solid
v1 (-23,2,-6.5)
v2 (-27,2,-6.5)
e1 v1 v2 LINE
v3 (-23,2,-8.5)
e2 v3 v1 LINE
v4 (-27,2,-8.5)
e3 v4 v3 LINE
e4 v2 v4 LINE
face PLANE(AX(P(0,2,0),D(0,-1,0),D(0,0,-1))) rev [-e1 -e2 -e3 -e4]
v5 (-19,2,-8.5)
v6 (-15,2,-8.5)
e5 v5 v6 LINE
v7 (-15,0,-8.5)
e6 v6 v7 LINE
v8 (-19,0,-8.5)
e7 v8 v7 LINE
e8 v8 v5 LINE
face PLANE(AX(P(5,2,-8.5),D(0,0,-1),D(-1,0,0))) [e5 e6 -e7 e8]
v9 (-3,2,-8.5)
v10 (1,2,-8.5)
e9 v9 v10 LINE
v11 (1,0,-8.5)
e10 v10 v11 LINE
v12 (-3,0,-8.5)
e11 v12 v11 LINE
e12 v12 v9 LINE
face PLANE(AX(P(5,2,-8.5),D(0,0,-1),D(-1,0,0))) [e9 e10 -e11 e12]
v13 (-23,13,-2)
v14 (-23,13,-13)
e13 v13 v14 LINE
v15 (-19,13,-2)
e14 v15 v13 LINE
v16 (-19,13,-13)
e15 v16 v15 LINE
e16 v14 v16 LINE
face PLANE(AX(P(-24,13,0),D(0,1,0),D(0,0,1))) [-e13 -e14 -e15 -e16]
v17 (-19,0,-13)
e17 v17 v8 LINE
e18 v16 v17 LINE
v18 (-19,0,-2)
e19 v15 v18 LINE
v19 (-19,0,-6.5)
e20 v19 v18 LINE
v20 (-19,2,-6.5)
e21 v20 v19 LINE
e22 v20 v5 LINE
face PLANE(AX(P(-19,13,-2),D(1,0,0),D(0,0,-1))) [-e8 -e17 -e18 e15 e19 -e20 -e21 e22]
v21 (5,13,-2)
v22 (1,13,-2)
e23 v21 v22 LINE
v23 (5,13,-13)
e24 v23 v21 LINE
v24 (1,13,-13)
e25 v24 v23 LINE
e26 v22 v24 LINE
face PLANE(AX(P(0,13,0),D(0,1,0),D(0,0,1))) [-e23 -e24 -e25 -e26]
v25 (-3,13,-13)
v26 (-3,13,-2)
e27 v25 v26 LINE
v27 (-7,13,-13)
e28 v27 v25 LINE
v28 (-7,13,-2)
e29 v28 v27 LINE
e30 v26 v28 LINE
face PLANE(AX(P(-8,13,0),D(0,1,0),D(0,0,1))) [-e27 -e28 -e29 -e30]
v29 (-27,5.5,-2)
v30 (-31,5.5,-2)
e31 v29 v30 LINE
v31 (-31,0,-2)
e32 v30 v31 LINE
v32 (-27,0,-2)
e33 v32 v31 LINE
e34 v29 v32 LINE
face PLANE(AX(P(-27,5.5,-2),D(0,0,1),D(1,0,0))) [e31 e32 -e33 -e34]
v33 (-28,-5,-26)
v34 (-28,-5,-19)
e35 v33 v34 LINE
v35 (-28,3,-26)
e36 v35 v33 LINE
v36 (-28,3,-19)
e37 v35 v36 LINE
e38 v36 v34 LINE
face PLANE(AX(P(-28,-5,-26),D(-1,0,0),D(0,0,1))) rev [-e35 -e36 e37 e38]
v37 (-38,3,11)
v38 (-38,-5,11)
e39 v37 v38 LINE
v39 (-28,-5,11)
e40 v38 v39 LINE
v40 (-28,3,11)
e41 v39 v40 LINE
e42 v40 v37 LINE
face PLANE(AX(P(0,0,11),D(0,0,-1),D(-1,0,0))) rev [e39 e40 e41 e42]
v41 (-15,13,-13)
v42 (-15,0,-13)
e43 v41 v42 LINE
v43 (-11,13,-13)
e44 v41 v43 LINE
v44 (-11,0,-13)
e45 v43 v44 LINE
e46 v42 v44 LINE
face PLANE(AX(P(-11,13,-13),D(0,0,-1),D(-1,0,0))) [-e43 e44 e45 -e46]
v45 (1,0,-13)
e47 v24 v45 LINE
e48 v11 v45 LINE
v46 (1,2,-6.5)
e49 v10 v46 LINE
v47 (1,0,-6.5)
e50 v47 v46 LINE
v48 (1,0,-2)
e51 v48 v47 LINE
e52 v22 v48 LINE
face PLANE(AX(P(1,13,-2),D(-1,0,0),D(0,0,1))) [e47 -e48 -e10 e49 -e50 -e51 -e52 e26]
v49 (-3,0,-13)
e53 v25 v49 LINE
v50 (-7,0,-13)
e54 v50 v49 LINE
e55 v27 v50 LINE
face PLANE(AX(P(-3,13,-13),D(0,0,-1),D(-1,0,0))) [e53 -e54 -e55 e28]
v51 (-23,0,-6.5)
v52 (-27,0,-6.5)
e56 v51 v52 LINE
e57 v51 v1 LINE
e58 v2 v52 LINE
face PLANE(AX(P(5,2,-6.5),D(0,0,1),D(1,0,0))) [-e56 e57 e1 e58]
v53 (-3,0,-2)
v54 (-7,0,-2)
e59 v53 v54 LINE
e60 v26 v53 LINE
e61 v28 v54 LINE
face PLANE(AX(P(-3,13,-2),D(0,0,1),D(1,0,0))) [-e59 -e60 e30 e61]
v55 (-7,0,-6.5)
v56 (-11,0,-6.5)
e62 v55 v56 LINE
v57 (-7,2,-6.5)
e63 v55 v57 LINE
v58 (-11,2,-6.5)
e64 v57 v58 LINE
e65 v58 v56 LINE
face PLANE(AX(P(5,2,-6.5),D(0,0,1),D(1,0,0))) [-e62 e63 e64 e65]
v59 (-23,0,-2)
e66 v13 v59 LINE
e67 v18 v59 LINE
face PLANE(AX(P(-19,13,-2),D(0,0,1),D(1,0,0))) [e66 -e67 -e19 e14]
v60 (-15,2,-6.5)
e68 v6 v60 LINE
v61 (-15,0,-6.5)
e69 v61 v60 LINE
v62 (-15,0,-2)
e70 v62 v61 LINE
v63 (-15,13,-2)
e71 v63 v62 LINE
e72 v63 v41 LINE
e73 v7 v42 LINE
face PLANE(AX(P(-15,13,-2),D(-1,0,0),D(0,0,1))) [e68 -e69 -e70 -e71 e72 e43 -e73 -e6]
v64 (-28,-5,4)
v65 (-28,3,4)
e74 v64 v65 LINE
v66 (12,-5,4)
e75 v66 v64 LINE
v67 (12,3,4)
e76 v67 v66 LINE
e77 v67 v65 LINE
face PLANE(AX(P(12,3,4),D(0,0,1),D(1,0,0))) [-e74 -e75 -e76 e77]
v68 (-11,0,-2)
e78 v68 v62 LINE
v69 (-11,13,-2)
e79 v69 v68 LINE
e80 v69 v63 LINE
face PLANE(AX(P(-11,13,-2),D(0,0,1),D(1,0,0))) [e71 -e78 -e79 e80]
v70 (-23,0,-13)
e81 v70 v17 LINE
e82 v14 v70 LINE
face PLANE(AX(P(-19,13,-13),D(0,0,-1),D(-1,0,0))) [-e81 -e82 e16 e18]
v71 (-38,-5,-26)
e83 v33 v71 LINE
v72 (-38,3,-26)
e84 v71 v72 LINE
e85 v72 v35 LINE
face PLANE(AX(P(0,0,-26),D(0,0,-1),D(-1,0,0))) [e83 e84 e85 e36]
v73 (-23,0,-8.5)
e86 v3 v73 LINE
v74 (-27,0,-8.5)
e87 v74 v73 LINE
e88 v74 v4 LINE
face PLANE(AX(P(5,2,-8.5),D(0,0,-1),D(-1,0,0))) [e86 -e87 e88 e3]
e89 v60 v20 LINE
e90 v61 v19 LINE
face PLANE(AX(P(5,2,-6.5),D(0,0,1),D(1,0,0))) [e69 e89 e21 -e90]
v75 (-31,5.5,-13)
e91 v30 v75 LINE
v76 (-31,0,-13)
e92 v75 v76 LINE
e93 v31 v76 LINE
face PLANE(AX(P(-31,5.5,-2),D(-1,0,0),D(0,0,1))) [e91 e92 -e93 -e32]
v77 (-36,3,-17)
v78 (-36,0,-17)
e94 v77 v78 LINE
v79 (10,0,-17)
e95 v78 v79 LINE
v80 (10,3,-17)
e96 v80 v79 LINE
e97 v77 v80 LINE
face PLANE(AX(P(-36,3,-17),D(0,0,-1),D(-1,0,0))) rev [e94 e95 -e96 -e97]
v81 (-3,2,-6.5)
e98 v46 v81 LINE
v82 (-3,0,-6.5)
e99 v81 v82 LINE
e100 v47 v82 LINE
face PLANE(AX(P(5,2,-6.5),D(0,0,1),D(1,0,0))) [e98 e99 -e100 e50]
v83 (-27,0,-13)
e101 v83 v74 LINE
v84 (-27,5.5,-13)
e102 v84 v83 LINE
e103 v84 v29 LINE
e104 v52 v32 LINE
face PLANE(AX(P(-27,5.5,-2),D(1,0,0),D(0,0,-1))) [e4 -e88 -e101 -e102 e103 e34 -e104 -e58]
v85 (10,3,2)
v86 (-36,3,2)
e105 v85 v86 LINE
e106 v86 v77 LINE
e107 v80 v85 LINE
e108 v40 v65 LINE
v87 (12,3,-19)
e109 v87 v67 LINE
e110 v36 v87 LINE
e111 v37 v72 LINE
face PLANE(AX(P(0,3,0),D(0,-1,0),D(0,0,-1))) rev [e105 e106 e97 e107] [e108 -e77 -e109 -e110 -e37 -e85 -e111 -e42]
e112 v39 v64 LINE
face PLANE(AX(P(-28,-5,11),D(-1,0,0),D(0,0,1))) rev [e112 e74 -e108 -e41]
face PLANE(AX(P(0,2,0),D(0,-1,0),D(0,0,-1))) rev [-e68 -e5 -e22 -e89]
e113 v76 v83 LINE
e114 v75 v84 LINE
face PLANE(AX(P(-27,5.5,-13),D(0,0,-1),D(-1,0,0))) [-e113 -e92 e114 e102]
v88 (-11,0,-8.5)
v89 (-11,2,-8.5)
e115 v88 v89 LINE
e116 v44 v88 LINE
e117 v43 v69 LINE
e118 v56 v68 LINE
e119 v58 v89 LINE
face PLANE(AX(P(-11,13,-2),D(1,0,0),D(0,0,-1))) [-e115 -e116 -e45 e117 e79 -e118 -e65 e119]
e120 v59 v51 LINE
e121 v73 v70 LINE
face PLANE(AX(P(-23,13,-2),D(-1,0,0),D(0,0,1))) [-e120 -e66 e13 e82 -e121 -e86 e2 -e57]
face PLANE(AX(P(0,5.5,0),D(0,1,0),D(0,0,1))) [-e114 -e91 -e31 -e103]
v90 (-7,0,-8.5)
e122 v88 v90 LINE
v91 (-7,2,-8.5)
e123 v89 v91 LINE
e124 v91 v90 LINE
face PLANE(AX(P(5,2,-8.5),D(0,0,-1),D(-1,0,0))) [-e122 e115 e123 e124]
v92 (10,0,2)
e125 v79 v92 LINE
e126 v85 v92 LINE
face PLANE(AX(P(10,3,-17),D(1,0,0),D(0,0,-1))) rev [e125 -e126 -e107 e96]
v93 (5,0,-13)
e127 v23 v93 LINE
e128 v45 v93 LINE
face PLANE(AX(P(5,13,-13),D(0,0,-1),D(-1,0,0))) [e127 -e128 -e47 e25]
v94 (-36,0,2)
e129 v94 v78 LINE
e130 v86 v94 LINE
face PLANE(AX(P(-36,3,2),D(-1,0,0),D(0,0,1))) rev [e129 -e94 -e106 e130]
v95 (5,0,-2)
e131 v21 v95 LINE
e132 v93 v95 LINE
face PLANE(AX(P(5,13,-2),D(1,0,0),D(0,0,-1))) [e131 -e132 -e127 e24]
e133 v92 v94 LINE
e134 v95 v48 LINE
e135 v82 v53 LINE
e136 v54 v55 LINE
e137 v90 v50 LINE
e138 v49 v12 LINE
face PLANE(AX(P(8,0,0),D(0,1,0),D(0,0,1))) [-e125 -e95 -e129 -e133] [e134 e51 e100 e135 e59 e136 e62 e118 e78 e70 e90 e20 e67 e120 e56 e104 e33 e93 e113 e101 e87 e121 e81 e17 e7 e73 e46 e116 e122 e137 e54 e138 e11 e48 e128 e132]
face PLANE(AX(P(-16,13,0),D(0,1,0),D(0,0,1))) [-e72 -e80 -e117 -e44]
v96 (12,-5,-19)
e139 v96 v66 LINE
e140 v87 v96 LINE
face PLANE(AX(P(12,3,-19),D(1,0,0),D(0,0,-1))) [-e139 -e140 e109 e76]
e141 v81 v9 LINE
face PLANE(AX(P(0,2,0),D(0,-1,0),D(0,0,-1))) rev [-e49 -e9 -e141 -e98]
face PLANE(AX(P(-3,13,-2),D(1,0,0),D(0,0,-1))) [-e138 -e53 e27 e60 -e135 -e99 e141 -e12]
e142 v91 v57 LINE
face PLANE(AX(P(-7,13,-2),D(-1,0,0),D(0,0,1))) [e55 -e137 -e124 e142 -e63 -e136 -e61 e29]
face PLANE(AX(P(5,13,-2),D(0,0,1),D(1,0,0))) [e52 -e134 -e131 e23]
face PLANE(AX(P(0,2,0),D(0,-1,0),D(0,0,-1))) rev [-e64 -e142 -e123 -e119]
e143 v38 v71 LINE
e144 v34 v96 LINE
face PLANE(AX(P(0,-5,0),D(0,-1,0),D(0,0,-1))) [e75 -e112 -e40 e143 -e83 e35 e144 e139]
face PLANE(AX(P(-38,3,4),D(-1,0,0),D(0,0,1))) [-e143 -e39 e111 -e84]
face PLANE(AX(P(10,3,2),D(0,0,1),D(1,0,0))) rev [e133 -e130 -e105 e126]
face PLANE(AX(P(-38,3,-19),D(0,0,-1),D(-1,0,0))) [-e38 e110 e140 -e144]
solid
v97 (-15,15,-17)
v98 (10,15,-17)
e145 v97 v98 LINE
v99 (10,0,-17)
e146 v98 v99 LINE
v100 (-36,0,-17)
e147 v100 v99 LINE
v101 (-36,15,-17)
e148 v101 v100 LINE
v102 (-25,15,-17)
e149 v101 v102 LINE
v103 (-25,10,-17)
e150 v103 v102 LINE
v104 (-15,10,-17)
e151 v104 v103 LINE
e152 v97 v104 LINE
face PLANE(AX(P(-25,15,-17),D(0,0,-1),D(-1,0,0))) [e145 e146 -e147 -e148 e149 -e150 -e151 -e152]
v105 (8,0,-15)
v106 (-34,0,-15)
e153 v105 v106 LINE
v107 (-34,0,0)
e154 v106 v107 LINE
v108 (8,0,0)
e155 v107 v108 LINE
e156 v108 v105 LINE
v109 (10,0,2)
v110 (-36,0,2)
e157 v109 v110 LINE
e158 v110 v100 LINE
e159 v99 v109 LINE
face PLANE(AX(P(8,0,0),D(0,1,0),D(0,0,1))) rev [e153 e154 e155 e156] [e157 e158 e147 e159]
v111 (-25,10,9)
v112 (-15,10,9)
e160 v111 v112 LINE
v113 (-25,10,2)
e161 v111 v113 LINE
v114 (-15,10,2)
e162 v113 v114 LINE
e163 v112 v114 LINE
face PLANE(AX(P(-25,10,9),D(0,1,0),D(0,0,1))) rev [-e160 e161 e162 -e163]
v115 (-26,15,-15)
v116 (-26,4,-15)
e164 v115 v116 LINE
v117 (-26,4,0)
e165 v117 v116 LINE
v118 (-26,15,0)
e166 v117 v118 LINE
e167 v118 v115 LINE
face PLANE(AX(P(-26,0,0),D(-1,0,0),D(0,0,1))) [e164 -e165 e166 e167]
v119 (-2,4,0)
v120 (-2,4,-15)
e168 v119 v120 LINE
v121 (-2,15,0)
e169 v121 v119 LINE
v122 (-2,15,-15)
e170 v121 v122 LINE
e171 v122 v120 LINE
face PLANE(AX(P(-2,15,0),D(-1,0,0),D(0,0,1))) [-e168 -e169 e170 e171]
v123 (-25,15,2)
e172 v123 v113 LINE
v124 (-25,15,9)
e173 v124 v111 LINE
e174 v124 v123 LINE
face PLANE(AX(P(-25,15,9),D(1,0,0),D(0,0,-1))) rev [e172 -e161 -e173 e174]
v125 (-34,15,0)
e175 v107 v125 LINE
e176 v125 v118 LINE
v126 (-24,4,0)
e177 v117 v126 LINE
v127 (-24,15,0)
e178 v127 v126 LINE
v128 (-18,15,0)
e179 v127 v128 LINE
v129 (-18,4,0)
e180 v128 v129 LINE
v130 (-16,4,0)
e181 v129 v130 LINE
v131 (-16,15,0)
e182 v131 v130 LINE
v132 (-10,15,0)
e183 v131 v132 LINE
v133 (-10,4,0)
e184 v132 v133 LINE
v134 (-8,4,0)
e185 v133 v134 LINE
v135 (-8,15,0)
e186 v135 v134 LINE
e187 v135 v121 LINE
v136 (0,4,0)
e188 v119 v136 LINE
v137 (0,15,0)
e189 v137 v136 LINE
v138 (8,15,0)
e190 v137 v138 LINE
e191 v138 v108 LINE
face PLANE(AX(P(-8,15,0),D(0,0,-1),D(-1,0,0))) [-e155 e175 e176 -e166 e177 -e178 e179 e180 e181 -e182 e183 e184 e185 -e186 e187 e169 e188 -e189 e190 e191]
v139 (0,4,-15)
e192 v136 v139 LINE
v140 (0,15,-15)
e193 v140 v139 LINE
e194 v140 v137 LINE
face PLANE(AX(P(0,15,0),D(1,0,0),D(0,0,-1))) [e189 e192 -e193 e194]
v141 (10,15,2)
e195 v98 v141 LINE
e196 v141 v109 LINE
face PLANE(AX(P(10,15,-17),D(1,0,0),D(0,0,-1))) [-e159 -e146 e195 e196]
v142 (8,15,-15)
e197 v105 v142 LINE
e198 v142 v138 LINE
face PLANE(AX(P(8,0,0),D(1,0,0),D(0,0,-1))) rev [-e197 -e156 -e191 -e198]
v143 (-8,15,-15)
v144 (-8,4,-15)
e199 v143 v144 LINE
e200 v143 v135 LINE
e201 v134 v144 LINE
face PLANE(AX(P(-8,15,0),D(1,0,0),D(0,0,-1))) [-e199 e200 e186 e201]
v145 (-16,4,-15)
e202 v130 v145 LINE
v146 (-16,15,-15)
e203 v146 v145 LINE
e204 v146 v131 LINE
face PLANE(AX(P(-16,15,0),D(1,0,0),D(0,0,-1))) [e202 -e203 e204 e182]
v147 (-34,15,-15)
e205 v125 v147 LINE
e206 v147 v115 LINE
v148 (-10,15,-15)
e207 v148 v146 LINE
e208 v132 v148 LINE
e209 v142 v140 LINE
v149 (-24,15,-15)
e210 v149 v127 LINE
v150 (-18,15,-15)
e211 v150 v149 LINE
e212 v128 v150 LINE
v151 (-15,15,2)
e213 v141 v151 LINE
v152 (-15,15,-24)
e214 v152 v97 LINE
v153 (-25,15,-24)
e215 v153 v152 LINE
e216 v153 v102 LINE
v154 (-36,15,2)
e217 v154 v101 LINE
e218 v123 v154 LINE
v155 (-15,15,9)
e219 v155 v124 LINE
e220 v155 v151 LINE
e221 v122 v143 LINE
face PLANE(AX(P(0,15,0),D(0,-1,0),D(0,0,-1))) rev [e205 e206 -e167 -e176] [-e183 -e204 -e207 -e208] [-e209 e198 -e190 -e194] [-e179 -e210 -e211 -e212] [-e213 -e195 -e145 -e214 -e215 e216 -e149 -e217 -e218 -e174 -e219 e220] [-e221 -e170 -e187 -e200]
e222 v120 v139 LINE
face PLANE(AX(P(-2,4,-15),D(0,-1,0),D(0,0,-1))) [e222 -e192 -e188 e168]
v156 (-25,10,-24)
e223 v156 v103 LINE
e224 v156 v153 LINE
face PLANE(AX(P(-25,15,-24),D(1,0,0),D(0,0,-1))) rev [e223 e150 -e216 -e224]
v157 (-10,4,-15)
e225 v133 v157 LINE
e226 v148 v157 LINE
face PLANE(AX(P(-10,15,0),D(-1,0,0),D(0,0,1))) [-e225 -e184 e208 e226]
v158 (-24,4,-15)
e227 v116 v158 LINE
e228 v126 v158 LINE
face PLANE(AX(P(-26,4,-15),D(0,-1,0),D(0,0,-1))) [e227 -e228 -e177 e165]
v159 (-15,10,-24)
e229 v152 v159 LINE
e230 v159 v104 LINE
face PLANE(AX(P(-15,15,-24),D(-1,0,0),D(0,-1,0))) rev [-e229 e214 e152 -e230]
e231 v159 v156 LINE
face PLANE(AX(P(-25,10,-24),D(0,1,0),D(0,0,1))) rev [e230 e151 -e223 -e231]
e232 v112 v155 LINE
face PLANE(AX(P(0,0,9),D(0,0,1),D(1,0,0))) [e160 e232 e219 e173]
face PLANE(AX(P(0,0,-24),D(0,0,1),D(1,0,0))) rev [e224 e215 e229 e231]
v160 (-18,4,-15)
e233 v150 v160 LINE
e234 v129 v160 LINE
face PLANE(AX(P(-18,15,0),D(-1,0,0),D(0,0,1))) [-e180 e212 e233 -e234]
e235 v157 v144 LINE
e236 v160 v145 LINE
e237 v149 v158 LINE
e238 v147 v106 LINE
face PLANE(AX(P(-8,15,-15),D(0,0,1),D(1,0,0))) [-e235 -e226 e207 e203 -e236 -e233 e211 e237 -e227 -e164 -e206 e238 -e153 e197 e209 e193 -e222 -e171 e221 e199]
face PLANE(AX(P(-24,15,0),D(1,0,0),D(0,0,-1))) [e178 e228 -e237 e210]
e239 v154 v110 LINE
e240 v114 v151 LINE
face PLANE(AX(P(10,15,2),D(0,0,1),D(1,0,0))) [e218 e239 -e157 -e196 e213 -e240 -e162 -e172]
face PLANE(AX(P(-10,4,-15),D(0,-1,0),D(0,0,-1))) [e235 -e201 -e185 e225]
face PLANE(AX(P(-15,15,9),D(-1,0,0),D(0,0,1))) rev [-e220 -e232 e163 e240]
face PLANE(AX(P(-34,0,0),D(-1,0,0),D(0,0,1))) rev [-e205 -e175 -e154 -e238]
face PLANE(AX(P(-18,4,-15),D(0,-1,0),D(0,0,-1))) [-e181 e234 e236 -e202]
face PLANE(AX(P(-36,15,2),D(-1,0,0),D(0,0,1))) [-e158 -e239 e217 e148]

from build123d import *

# Parameters (mm, degrees)
SKETCH1_W                = 6
SKETCH1_H                = 15
BOSS_EXTRUDE1_DEPTH      = 15
SKETCH2_W                = 4
SKETCH2_H                = 11
CUT_EXTRUDE1_DEPTH       = 13
SKETCH3_W                = 15
SKETCH3_H                = 4
BOSS_EXTRUDE2_DEPTH      = 2
LPATTERN1_COUNT          = 4
LPATTERN1_PITCH          = 8
SKETCH4_W                = 15
SKETCH4_H                = 15
BOSS_EXTRUDE3_DEPTH      = 8
SKETCH5_W                = 4
SKETCH5_H                = 11
CUT_EXTRUDE2_DEPTH       = 5.5
SKETCH6_W                = 15
SKETCH6_H                = 15
BOSS_EXTRUDE4_DEPTH      = 2
SKETCH7_W                = 36
SKETCH7_H                = 2
CUT_EXTRUDE3_DEPTH       = 2
BOSS_EXTRUDE5_DEPTH      = 5
BOSS_EXTRUDE5_DEPTH_BACK = 15
SKETCH8_W                = 35
SKETCH8_H                = 19
BOSS_EXTRUDE6_DEPTH      = 5
BOSS_EXTRUDE6_DEPTH_BACK = 15
SKETCH9_W                = 11
SKETCH9_H                = 19
SPLIT1_START             = -5
SPLIT1_OUTLINE_W         = 46
SPLIT1_OUTLINE_H         = 19
SPLIT1_DEPTH             = 5
SPLIT1_2_OUTLINE_W       = 4
SPLIT1_2_OUTLINE_H       = 11
SPLIT1_2_DEPTH           = 13
SPLIT1_3_OUTLINE_W       = 4
SPLIT1_3_OUTLINE_H       = 2
SPLIT1_3_DEPTH           = 2
SPLIT1_START_2           = -13
SPLIT1_4_DEPTH           = 11
SPLIT1_START_3           = -17
SPLIT1_5_OUTLINE_W       = 46
SPLIT1_5_OUTLINE_H       = 5
SPLIT1_5_DEPTH           = 19
SPLIT1_START_4           = -8.5
SPLIT1_6_OUTLINE_W       = 4
SPLIT1_6_OUTLINE_H       = 2
SPLIT1_6_DEPTH           = 2
SKETCH15_W               = 10
SKETCH15_H               = 5
BOSS_EXTRUDE13_DEPTH     = 7
SKETCH16_W               = 10
SKETCH16_H               = 5
BOSS_EXTRUDE14_DEPTH     = 7
SKETCH17_W               = 50
SKETCH17_H               = 23
SKETCH17_W_2             = 46
SKETCH17_H_2             = 19
BOSS_EXTRUDE15_DEPTH     = 8
SKETCH18_W               = 10
SKETCH18_H               = 8
BOSS_EXTRUDE16_DEPTH     = 7
SKETCH19_W               = 10
SKETCH19_H               = 8
BOSS_EXTRUDE17_DEPTH     = 7


# Read off the part's stored shape, not the designer's step: Split1
with BuildPart() as part:
    # Sketch1 → Boss-Extrude1 (new body)
    with BuildSketch(Plane(origin=(0, 0, 0), x_dir=(1, 0, 0), z_dir=(0, 1, 0))):
        with Locations((3, 7.5)):
            Rectangle(SKETCH1_W, SKETCH1_H)
    extrude(amount=BOSS_EXTRUDE1_DEPTH)

    # Sketch2 → Cut-Extrude1 (cut)
    with BuildSketch(Plane.XZ):
        with Locations((3, -7.5)):
            Rectangle(SKETCH2_W, SKETCH2_H)
    extrude(amount=-CUT_EXTRUDE1_DEPTH, mode=Mode.SUBTRACT)

    # Sketch3 → Boss-Extrude2 (add)
    with BuildSketch(Plane.ZY):
        with Locations((-7.5, 2)):
            Rectangle(SKETCH3_W, SKETCH3_H)
    extrude(amount=BOSS_EXTRUDE2_DEPTH)


with BuildPart() as lpattern1_1:
    # LPattern1: pattern copy
    add(part.part.moved(Location(Vector(-1, 0, 0) * (1 * LPATTERN1_PITCH))))


with BuildPart() as lpattern1_2:
    # LPattern1: pattern copy
    add(part.part.moved(Location(Vector(-1, 0, 0) * (2 * LPATTERN1_PITCH))))


with BuildPart() as lpattern1_3:
    # LPattern1: pattern copy
    add(part.part.moved(Location(Vector(-1, 0, 0) * (3 * LPATTERN1_PITCH))))

    # Sketch4 → Boss-Extrude3 (add)
    with BuildSketch(Plane.ZY.offset(26)):
        with Locations((-7.5, 7.5)):
            Rectangle(SKETCH4_W, SKETCH4_H)
    extrude(amount=BOSS_EXTRUDE3_DEPTH)

    # Sketch5 → Cut-Extrude2 (cut)
    with BuildSketch(Plane.XZ):
        with Locations((-29, -7.5)):
            Rectangle(SKETCH5_W, SKETCH5_H)
    extrude(amount=-CUT_EXTRUDE2_DEPTH, mode=Mode.SUBTRACT)


with BuildPart() as lpattern1_1_1:
    add(lpattern1_1.part)

    # Combine1: union LPattern1_2, LPattern1_3, part
    add(lpattern1_2.part)
    add(lpattern1_3.part)
    add(part.part)

    # Sketch6 → Boss-Extrude4 (add)
    with BuildSketch(Plane(origin=(6, 0, 0), x_dir=(0, 0, -1), z_dir=(1, 0, 0))):
        with Locations((7.5, 7.5)):
            Rectangle(SKETCH6_W, SKETCH6_H)
    extrude(amount=BOSS_EXTRUDE4_DEPTH)

    # Sketch7 → Cut-Extrude3 (cut)
    with BuildSketch(Plane.XZ):
        with Locations((-13, -7.5)):
            Rectangle(SKETCH7_W, SKETCH7_H)
    extrude(amount=-CUT_EXTRUDE3_DEPTH, mode=Mode.SUBTRACT)


with BuildPart() as body_2:
    # Sketch8 → Boss-Extrude5 (new, two sides: drawn at the far end of the back side and taken through both)
    with BuildSketch(Plane.XZ.offset(-BOSS_EXTRUDE5_DEPTH_BACK)):
        with Locations((-7.5, -7.5)):
            Rectangle(SKETCH8_W, SKETCH8_H)
    extrude(amount=BOSS_EXTRUDE5_DEPTH + BOSS_EXTRUDE5_DEPTH_BACK)


with BuildPart() as body_3:
    # Sketch9 → Boss-Extrude6 (new, two sides: drawn at the far end of the back side and taken through both)
    with BuildSketch(Plane.XZ.offset(-BOSS_EXTRUDE6_DEPTH_BACK)):
        with Locations((-30.5, -7.5)):
            Rectangle(SKETCH9_W, SKETCH9_H)
    extrude(amount=BOSS_EXTRUDE6_DEPTH + BOSS_EXTRUDE6_DEPTH_BACK)


with BuildPart() as body_2_1:
    add(body_2.part)

    # Combine3: union body 3
    add(body_3.part)

    # Combine4: cut LPattern1_1
    add(lpattern1_1_1.part, mode=Mode.SUBTRACT)

    # Split1 outline → Split1 (cut)
    with BuildSketch(Plane(origin=(0, 0, 0), x_dir=(1, 0, 0), z_dir=(0, 1, 0)).offset(SPLIT1_START)):
        with Locations((-13, 7.5)):
            Rectangle(SPLIT1_OUTLINE_W, SPLIT1_OUTLINE_H)
    extrude(amount=SPLIT1_DEPTH, mode=Mode.SUBTRACT)

    # Split1 2 outline → Split1 2 (cut)
    with BuildSketch(Plane(origin=(0, 0, 0), x_dir=(1, 0, 0), z_dir=(0, 1, 0))):
        with Locations((-5, 7.5)):
            Rectangle(SPLIT1_2_OUTLINE_W, SPLIT1_2_OUTLINE_H)
        with Locations((3, 7.5)):
            Rectangle(SPLIT1_2_OUTLINE_W, SPLIT1_2_OUTLINE_H)
        with Locations((-13, 7.5)):
            Rectangle(SPLIT1_2_OUTLINE_W, SPLIT1_2_OUTLINE_H)
        with Locations((-21, 7.5)):
            Rectangle(SPLIT1_2_OUTLINE_W, SPLIT1_2_OUTLINE_H)
        with Locations((-29, 7.5)):
            Rectangle(SPLIT1_2_OUTLINE_W, SPLIT1_2_OUTLINE_H)
    extrude(amount=SPLIT1_2_DEPTH, mode=Mode.SUBTRACT)

    # Split1 3 outline → Split1 3 (cut)
    with BuildSketch(Plane(origin=(0, 0, 0), x_dir=(1, 0, 0), z_dir=(0, 1, 0))):
        with Locations((-1, 7.5)):
            Rectangle(SPLIT1_3_OUTLINE_W, SPLIT1_3_OUTLINE_H)
        with Locations((-9, 7.5)):
            Rectangle(SPLIT1_3_OUTLINE_W, SPLIT1_3_OUTLINE_H)
        with Locations((-17, 7.5)):
            Rectangle(SPLIT1_3_OUTLINE_W, SPLIT1_3_OUTLINE_H)
        with Locations((-25, 7.5)):
            Rectangle(SPLIT1_3_OUTLINE_W, SPLIT1_3_OUTLINE_H)
    extrude(amount=SPLIT1_3_DEPTH, mode=Mode.SUBTRACT)

    # Sketch15 → Boss-Extrude13 (add)
    with BuildSketch(Plane.XY.offset(2)):
        with Locations((-20, 12.5)):
            Rectangle(SKETCH15_W, SKETCH15_H)
    extrude(amount=BOSS_EXTRUDE13_DEPTH)

    # Sketch16 → Boss-Extrude14 (add)
    with BuildSketch(Plane(origin=(0, 0, -17), x_dir=(-1, 0, 0), z_dir=(0, 0, -1))):
        with Locations((20, 12.5)):
            Rectangle(SKETCH16_W, SKETCH16_H)
    extrude(amount=BOSS_EXTRUDE14_DEPTH)


with BuildPart() as body_2_2:
    # Split1 4 outline → Split1 4 (new body)
    with BuildSketch(Plane.XY.offset(SPLIT1_START_2)):
        Polygon((-27, 5.5), (-31, 5.5), (-31, 0), (-36, 0), (-36, -5), (10, -5), (10, 0), (5, 0), (5, 13), (1, 13), (1, 0), (-3, 0), (-3, 13), (-7, 13), (-7, 0), (-11, 0), (-11, 13), (-15, 13), (-15, 0), (-19, 0), (-19, 13), (-23, 13), (-23, 0), (-27, 0), align=None)
    extrude(amount=SPLIT1_4_DEPTH)

    # Split1 5 outline → Split1 5 (add)
    with BuildSketch(Plane.XY.offset(SPLIT1_START_3)):
        with Locations((-13, -2.5)):
            Rectangle(SPLIT1_5_OUTLINE_W, SPLIT1_5_OUTLINE_H)
    extrude(amount=SPLIT1_5_DEPTH)

    # Split1 6 outline → Split1 6 (add)
    with BuildSketch(Plane.XY.offset(SPLIT1_START_4)):
        with Locations((-25, 1)):
            Rectangle(SPLIT1_6_OUTLINE_W, SPLIT1_6_OUTLINE_H)
        with Locations((-17, 1)):
            Rectangle(SPLIT1_6_OUTLINE_W, SPLIT1_6_OUTLINE_H)
        with Locations((-9, 1)):
            Rectangle(SPLIT1_6_OUTLINE_W, SPLIT1_6_OUTLINE_H)
        with Locations((-1, 1)):
            Rectangle(SPLIT1_6_OUTLINE_W, SPLIT1_6_OUTLINE_H)
    extrude(amount=SPLIT1_6_DEPTH)

    # Sketch17 → Boss-Extrude15 (add)
    with BuildSketch(Plane.XZ.offset(5)):
        with Locations((-13, -7.5)):
            Rectangle(SKETCH17_W, SKETCH17_H)
        with Locations((-13, -7.5)):
            Rectangle(SKETCH17_W_2, SKETCH17_H_2, mode=Mode.SUBTRACT)
    extrude(amount=-BOSS_EXTRUDE15_DEPTH)

    # Sketch18 → Boss-Extrude16 (add)
    with BuildSketch(Plane.XY.offset(4)):
        with Locations((-33, -1)):
            Rectangle(SKETCH18_W, SKETCH18_H)
    extrude(amount=BOSS_EXTRUDE16_DEPTH)

    # Sketch19 → Boss-Extrude17 (add)
    with BuildSketch(Plane(origin=(0, 0, -19), x_dir=(-1, 0, 0), z_dir=(0, 0, -1))):
        with Locations((33, -1)):
            Rectangle(SKETCH19_W, SKETCH19_H)
    extrude(amount=BOSS_EXTRUDE17_DEPTH)


solid = Compound([body_2_1.part, body_2_2.part])
